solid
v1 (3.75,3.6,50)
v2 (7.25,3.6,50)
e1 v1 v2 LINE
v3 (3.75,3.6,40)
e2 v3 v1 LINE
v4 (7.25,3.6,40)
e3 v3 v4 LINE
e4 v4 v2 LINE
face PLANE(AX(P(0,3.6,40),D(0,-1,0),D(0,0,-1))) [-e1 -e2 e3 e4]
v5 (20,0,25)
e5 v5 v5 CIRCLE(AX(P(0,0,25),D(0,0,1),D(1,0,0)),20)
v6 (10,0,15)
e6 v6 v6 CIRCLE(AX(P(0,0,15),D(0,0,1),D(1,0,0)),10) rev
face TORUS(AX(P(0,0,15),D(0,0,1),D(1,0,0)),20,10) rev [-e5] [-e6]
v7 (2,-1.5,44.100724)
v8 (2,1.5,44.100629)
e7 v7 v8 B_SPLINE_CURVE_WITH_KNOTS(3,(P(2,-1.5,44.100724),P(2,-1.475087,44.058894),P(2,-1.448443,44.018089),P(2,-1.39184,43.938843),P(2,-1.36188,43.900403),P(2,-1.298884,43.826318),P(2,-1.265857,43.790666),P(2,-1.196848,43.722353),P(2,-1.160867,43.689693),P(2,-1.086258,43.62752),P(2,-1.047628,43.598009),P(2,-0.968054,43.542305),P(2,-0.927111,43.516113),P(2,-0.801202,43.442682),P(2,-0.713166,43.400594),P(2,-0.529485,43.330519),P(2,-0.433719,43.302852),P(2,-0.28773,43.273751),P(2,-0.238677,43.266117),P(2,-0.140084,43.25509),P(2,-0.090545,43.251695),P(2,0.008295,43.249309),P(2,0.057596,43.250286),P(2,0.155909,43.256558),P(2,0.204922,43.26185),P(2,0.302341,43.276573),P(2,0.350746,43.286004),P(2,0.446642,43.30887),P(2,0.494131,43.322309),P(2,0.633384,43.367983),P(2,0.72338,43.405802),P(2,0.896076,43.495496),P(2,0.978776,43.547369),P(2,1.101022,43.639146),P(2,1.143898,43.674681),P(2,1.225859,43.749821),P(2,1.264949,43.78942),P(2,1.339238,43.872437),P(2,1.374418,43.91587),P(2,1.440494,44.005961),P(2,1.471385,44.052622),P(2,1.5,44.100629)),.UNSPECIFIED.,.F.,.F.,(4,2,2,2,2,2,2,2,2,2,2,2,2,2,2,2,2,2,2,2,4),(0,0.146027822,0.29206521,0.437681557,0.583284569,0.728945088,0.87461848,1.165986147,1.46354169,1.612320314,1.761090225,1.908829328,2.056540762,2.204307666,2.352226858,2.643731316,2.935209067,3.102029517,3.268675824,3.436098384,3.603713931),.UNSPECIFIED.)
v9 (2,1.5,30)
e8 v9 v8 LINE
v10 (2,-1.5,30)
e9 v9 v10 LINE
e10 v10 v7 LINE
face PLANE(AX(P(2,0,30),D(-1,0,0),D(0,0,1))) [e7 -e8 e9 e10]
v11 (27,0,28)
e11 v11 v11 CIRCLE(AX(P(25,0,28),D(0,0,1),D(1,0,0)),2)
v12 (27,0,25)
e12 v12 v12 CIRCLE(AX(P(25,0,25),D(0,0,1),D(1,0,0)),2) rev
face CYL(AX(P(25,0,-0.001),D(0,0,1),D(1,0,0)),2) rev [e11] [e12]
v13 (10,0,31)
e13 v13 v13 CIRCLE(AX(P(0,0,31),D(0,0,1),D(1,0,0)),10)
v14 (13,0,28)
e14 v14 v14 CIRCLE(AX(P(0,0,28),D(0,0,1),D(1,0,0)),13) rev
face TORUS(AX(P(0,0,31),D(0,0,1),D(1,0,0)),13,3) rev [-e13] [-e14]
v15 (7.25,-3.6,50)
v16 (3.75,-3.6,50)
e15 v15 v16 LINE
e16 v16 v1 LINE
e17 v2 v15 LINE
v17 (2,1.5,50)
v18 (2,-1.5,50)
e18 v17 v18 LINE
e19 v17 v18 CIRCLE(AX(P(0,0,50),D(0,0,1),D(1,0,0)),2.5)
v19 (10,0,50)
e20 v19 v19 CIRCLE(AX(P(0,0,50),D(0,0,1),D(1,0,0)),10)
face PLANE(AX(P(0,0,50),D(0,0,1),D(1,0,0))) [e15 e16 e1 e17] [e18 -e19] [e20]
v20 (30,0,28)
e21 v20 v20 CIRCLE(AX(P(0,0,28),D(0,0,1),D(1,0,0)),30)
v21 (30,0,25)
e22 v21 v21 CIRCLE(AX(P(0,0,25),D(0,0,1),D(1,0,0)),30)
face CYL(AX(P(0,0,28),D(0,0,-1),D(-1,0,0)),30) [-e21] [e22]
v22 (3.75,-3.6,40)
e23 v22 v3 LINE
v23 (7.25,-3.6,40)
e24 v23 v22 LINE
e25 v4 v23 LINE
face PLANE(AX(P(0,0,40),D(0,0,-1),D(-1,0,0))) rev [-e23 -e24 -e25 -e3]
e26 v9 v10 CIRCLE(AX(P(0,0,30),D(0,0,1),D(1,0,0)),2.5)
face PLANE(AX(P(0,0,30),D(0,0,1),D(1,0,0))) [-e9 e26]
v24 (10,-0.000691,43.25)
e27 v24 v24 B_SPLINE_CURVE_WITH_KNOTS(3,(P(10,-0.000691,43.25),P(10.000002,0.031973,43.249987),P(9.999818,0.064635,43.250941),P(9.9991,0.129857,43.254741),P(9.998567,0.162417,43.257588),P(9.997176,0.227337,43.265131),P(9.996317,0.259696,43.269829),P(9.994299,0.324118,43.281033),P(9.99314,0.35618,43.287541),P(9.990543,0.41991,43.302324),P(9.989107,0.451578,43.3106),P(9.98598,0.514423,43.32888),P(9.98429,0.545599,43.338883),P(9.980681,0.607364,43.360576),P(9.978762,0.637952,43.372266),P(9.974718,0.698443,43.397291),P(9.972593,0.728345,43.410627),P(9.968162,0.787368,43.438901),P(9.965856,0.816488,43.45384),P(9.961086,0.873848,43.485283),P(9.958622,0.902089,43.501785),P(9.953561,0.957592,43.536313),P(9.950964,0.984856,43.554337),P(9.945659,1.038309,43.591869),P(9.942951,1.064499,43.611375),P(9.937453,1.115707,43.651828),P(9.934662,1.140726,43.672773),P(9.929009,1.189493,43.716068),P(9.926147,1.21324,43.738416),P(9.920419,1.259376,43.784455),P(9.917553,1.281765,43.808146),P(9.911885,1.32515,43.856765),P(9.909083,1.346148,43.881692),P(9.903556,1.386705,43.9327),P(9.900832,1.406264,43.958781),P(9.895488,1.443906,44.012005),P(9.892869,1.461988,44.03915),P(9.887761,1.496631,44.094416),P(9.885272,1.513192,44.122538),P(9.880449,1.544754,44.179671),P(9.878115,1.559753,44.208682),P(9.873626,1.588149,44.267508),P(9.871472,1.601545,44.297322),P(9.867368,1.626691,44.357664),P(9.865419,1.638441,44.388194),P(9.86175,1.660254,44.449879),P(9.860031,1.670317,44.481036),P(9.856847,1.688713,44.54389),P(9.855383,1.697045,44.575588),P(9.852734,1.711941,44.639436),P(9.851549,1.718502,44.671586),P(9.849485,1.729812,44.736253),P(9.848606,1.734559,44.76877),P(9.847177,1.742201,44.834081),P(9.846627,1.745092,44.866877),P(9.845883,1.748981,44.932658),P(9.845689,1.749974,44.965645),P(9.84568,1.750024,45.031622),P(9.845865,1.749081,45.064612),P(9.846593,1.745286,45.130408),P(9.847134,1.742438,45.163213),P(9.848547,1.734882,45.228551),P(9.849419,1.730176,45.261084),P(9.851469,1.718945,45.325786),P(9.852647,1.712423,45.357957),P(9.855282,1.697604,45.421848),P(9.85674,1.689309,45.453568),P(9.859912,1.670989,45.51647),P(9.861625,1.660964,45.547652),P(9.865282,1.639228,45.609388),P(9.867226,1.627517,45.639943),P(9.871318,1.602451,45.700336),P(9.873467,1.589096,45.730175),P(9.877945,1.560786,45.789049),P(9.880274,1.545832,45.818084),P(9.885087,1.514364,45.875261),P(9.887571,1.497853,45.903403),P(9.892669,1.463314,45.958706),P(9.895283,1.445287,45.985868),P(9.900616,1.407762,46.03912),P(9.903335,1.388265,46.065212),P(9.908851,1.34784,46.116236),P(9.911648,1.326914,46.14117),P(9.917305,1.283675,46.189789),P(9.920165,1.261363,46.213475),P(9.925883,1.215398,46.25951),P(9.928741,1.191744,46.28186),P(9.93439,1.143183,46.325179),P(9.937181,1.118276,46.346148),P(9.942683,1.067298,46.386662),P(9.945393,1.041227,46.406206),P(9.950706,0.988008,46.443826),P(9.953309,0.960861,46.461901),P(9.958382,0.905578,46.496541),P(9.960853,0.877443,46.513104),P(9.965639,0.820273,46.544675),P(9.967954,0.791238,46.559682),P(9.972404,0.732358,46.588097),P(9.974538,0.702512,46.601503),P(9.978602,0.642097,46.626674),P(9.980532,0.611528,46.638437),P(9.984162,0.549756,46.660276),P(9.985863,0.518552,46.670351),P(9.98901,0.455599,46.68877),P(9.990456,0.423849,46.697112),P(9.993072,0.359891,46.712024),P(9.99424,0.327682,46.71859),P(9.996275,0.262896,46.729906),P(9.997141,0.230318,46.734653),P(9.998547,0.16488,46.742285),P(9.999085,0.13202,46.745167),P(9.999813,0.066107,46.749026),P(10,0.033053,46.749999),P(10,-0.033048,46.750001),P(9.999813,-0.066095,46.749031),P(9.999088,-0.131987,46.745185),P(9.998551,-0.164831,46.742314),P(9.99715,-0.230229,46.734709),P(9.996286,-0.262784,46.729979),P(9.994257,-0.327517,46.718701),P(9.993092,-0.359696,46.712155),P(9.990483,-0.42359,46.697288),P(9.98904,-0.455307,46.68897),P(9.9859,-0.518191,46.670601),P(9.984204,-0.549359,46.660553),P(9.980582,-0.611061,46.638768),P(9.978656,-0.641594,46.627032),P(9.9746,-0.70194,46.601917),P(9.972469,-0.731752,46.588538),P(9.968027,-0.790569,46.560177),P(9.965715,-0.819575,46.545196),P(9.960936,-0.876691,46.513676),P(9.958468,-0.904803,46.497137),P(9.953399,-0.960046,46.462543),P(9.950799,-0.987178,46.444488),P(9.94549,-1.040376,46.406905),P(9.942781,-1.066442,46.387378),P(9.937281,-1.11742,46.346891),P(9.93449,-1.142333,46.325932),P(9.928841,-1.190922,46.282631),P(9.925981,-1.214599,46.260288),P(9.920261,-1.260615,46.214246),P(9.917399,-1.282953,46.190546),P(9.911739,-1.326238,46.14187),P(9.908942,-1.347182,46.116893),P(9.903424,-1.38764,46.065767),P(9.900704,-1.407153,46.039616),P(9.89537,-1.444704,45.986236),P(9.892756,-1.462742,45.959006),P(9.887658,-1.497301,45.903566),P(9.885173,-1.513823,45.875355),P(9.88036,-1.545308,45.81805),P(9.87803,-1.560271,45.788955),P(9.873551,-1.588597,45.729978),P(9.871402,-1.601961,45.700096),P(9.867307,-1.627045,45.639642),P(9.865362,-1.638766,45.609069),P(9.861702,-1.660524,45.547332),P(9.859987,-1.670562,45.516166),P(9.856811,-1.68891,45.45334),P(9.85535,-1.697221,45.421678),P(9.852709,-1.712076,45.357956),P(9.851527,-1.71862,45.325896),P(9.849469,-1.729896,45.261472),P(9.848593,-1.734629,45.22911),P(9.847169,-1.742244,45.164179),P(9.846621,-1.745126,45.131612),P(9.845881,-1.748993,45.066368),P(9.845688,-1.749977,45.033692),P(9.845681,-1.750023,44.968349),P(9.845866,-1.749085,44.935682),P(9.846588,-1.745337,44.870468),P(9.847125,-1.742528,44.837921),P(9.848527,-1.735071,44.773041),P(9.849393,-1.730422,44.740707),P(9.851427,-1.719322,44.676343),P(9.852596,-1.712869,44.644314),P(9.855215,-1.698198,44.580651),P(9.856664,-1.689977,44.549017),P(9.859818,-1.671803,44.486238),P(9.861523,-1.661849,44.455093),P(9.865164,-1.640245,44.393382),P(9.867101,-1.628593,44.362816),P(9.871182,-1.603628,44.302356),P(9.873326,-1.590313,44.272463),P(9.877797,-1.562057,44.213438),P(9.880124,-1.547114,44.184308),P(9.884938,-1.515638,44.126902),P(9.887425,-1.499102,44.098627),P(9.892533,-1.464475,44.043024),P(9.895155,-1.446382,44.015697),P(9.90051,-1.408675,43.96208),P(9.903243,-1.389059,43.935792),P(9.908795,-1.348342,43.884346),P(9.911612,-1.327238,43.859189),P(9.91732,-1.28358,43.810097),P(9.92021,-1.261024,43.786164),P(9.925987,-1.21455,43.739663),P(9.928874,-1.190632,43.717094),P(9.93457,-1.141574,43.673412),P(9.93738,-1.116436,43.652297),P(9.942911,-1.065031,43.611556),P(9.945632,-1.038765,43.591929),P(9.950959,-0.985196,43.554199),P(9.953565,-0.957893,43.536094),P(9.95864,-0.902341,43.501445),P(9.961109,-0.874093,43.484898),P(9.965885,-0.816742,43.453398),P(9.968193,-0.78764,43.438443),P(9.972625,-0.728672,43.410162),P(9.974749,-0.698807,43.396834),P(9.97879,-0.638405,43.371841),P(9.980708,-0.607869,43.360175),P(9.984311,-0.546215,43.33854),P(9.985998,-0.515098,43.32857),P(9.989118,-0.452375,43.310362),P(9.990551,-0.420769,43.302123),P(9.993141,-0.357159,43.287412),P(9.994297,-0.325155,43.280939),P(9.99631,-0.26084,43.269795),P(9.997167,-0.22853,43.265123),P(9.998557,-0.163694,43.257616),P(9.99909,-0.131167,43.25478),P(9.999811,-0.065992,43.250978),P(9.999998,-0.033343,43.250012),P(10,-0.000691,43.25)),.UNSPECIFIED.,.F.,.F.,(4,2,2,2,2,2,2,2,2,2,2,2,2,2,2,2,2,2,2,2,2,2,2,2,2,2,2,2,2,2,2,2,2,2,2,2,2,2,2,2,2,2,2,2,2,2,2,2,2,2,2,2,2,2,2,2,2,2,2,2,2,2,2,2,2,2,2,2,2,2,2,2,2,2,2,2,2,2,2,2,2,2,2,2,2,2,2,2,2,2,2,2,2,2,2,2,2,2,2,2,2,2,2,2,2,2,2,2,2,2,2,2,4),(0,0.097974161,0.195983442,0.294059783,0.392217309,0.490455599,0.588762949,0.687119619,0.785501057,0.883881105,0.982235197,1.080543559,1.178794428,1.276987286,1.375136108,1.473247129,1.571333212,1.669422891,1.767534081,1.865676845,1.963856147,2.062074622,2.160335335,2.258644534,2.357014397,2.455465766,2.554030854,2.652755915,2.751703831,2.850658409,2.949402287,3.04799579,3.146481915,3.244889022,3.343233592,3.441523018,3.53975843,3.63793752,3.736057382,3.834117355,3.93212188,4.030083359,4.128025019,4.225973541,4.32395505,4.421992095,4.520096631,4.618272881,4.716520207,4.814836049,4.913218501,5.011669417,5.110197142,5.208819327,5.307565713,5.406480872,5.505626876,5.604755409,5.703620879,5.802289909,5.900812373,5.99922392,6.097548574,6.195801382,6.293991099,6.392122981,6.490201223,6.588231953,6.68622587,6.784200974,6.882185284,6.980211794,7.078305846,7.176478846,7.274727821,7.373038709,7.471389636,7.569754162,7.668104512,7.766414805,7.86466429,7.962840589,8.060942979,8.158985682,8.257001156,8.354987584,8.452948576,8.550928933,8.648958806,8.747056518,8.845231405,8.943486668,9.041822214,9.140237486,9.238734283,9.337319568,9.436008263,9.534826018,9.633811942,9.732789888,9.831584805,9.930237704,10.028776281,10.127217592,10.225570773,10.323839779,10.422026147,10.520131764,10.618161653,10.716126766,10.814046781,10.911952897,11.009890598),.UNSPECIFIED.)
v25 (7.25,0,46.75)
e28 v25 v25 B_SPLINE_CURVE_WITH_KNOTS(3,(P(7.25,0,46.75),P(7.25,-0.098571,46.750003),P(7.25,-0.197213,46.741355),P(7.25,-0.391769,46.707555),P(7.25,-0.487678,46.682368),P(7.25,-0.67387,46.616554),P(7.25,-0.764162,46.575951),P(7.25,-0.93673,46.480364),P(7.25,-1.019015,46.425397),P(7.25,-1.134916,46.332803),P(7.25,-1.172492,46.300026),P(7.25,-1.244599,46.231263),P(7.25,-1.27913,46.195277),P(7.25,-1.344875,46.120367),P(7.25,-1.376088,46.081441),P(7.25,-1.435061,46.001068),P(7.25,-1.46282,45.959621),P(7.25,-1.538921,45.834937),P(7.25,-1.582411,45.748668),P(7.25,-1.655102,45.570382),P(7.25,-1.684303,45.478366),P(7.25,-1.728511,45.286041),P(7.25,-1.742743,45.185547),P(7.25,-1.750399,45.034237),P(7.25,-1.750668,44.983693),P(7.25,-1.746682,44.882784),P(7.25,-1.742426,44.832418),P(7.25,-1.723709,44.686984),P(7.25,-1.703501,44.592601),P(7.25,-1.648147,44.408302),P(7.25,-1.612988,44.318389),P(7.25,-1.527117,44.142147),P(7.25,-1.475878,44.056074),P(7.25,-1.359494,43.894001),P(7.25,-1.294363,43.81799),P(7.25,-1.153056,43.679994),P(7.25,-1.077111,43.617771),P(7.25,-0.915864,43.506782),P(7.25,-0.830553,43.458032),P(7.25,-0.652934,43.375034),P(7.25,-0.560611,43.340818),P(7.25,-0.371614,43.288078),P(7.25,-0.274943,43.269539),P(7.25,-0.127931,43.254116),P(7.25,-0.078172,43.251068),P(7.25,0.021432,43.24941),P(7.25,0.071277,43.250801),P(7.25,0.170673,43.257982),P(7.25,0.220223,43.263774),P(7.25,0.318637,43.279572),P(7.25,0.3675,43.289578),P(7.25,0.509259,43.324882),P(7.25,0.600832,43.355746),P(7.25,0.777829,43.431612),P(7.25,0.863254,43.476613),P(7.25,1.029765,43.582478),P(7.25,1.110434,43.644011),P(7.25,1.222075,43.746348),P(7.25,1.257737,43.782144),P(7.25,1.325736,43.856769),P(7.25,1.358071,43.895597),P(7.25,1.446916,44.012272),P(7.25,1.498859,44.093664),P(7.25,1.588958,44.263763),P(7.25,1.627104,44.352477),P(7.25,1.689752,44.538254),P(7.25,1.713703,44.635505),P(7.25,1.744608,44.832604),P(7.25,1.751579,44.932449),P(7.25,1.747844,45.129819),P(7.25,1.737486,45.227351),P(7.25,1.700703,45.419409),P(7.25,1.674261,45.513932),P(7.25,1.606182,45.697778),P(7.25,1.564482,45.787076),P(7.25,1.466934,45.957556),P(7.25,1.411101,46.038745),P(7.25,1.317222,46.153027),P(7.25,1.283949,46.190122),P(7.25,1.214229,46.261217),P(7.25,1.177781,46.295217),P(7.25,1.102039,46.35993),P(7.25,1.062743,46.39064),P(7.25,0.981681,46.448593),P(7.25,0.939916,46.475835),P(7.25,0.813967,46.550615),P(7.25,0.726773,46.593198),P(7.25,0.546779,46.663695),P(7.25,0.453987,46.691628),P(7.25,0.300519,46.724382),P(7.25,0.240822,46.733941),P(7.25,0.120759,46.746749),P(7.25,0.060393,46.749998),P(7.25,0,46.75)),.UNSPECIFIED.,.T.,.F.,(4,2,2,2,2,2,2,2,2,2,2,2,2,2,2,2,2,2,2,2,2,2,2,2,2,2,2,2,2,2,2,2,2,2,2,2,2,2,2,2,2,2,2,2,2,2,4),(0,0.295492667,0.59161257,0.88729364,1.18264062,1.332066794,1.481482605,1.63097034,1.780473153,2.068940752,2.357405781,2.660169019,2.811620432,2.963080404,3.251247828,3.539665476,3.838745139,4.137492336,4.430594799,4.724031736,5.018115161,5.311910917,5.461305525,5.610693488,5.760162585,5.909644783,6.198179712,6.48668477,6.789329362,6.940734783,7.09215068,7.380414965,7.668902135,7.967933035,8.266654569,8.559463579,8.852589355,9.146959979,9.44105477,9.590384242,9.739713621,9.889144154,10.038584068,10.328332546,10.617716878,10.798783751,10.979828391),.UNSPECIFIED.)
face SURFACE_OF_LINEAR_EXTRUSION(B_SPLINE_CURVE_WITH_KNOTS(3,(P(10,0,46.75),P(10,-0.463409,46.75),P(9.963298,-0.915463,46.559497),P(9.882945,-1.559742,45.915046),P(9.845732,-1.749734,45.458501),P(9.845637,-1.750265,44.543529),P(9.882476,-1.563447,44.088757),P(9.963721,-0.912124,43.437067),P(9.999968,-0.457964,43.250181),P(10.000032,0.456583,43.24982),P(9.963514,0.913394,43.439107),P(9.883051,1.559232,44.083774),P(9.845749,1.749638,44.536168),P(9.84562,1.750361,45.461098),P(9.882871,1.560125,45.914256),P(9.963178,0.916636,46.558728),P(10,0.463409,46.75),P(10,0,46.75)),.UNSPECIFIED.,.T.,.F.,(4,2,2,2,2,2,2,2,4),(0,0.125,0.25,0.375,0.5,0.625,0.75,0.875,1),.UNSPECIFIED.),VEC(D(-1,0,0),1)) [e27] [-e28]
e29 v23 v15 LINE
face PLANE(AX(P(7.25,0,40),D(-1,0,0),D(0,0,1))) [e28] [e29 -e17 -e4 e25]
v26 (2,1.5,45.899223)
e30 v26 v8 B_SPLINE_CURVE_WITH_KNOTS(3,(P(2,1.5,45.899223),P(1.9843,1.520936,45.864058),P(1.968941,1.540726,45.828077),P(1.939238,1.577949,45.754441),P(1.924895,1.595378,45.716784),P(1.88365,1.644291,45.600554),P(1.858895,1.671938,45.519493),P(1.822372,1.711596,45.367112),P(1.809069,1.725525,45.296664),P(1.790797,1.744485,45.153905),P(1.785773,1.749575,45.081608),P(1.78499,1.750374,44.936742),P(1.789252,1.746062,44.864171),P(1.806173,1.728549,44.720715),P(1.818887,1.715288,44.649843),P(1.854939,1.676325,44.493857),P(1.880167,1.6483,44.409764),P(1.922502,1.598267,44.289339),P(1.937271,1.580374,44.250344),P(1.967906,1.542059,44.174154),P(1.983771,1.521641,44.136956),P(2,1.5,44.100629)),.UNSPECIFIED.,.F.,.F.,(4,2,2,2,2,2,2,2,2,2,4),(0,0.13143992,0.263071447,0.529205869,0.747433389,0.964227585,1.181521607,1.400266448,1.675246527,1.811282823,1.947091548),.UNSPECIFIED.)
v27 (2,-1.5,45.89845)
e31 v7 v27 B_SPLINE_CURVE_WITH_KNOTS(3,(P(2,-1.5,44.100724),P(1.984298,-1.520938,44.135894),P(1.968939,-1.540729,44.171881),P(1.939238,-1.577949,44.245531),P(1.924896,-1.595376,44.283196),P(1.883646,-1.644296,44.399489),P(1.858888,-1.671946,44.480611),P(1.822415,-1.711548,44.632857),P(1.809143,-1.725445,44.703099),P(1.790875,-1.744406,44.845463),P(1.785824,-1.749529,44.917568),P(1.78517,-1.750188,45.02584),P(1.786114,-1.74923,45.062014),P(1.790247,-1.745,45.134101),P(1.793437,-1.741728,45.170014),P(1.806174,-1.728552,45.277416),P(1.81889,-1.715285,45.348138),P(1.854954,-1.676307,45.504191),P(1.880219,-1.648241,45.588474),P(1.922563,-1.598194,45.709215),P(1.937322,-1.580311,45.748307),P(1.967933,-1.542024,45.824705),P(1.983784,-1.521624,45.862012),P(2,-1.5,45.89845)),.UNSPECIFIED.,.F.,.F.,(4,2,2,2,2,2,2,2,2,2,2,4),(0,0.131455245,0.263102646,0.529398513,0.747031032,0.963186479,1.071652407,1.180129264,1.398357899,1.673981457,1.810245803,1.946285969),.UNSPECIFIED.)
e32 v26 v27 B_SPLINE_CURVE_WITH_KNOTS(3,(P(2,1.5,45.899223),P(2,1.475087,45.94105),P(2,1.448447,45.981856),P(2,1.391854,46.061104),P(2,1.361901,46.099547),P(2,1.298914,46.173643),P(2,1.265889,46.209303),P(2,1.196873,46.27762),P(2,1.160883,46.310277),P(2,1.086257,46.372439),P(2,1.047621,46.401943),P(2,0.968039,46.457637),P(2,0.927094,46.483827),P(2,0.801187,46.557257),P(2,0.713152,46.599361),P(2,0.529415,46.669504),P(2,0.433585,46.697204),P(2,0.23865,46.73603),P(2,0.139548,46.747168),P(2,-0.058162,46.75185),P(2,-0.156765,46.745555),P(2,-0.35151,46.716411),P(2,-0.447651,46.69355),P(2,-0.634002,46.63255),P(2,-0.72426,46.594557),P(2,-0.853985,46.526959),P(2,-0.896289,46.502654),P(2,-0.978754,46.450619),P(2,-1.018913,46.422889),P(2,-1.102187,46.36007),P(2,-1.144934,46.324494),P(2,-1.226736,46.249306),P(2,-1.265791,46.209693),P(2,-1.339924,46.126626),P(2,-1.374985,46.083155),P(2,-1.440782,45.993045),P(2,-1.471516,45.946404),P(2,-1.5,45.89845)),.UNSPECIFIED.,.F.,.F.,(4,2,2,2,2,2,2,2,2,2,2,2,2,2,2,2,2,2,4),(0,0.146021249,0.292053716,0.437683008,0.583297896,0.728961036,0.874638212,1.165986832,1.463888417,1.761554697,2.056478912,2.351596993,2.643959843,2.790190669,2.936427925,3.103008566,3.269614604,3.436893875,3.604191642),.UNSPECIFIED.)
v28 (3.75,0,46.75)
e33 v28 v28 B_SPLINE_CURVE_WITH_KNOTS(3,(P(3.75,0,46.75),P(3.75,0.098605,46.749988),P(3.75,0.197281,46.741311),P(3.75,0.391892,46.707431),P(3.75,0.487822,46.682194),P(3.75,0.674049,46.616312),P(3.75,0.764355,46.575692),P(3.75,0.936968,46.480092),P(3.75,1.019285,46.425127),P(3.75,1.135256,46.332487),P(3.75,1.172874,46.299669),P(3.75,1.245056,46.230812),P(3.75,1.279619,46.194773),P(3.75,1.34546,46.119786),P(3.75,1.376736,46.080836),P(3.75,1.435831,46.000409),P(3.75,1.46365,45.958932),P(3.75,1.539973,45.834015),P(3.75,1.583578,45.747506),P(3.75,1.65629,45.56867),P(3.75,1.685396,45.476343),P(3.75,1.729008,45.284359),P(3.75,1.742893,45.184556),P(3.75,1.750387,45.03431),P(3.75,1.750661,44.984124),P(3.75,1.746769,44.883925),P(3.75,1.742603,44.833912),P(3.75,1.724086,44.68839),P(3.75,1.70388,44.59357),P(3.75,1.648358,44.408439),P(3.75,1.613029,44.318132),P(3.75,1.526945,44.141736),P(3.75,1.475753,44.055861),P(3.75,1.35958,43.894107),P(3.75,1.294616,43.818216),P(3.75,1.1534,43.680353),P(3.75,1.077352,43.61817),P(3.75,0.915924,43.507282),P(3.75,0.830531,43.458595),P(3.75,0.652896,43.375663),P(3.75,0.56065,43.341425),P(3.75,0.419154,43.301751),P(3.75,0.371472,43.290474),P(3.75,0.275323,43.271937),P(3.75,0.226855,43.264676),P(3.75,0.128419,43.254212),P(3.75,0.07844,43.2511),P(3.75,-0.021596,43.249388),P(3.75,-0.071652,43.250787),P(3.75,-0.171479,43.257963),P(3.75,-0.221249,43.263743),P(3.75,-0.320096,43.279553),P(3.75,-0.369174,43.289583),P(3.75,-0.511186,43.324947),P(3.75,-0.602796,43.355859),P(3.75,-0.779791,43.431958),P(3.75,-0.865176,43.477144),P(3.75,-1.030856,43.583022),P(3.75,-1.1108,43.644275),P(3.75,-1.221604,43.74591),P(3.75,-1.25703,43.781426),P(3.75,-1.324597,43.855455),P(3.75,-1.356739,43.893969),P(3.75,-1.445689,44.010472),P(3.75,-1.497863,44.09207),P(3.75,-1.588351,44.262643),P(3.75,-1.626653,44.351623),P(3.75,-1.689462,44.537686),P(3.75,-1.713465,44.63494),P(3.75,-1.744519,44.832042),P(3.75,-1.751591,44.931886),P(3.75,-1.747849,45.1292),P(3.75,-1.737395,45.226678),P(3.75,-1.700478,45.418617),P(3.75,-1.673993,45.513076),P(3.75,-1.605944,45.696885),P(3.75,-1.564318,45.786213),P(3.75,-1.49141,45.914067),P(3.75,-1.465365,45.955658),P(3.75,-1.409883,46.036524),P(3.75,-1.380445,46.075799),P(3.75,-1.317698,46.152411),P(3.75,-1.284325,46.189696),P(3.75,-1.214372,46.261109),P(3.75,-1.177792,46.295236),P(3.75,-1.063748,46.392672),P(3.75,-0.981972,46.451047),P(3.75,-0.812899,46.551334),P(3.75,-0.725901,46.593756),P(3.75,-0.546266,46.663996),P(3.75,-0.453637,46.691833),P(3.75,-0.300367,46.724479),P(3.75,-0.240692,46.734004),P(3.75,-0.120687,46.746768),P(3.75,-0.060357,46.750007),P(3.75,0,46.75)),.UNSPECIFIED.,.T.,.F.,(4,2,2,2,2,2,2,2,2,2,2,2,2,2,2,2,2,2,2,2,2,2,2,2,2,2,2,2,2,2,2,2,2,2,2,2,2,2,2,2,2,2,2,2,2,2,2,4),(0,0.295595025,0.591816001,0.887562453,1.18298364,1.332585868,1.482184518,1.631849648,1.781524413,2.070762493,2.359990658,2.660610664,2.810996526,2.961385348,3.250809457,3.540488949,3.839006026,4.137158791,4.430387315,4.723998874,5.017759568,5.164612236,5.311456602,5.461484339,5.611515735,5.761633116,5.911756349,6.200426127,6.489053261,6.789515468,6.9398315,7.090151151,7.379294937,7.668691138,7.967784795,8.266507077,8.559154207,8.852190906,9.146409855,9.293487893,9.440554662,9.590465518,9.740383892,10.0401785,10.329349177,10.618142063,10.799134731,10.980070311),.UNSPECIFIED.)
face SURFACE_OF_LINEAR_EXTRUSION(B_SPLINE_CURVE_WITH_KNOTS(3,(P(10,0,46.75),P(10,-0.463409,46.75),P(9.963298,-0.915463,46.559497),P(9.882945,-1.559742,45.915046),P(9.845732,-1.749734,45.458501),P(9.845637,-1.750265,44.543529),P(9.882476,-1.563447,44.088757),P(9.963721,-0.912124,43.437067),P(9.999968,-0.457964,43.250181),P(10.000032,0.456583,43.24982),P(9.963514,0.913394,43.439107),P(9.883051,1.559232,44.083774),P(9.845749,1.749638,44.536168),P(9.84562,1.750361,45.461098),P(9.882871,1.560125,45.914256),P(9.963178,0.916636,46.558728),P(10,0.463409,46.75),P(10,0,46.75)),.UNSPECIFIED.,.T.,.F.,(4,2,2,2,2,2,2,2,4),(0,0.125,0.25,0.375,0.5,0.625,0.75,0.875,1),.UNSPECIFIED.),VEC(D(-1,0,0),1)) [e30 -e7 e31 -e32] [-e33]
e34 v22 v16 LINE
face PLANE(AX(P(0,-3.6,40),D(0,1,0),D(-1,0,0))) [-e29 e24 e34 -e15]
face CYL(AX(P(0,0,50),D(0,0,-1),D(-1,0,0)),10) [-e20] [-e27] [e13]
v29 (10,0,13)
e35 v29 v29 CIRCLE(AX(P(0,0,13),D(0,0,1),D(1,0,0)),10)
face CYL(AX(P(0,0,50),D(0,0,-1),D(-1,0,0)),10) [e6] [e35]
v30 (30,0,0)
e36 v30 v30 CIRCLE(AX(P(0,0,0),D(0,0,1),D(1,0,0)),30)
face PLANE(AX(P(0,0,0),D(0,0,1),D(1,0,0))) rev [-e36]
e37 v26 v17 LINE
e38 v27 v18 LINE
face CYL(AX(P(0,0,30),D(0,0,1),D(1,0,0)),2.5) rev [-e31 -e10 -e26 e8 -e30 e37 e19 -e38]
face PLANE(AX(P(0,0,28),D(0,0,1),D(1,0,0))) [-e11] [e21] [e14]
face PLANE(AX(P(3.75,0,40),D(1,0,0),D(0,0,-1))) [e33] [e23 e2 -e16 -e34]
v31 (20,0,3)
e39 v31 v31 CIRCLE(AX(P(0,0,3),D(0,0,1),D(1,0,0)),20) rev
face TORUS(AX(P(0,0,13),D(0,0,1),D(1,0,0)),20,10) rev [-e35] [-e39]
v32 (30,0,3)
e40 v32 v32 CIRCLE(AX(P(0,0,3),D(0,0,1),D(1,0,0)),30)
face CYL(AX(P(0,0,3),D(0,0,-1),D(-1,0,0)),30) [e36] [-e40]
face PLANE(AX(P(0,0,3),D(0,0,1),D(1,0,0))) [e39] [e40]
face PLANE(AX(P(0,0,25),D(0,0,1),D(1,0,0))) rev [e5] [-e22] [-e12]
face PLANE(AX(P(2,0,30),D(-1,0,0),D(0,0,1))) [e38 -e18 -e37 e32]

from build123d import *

# Parameters (mm, degrees)
CROQUIS1_R              = 10
SALIENTE_EXTRUIR2_DEPTH = 50
CROQUIS4_R              = 30
SALIENTE_EXTRUIR3_DEPTH = 3
SALIENTE_EXTRUIR4_START = 25
CROQUIS5_R              = 30
SALIENTE_EXTRUIR4_DEPTH = 3
REDONDEO2_R             = 10
CORTAR_EXTRUIR1_START   = 50
CORTAR_EXTRUIR1_DEPTH   = 20
CORTAR_EXTRUIR2_START   = 50
CROQUIS7_W              = 3.5
CROQUIS7_H              = 7.2
CORTAR_EXTRUIR2_DEPTH   = 10
CORTAR_EXTRUIR3_START   = 1.785357468
CORTAR_EXTRUIR3_DEPTH   = 8.214642632
CORTAR_EXTRUIR4_START   = 25
CROQUIS9_R              = 2
CORTAR_EXTRUIR4_DEPTH   = 3
REDONDEO3_R             = 3


# Read off the part's stored shape, not the designer's step: Cortar-Extruir3
with BuildPart() as part:
    # Croquis1 → Saliente-Extruir2 (new body)
    with BuildSketch(Plane.XY):
        Circle(CROQUIS1_R)
    extrude(amount=SALIENTE_EXTRUIR2_DEPTH)

    # Croquis4 → Saliente-Extruir3 (add)
    with BuildSketch(Plane.XY):
        Circle(CROQUIS4_R)
    extrude(amount=SALIENTE_EXTRUIR3_DEPTH)

    # Croquis5 → Saliente-Extruir4 (add)
    with BuildSketch(Plane.XY.offset(SALIENTE_EXTRUIR4_START)):
        Circle(CROQUIS5_R)
    extrude(amount=SALIENTE_EXTRUIR4_DEPTH)

    # Redondeo2
    redondeo2_edges = [part.edges().sort_by_distance(p)[0] for p in [
        (-10, 0, 25),
        (-10, 0, 3),
    ]]
    fillet(redondeo2_edges, radius=REDONDEO2_R)

    # Croquis6 → Cortar-Extruir1 (cut)
    with BuildSketch(Plane.XY.offset(CORTAR_EXTRUIR1_START)):
        with BuildLine():
            Line((2, 1.5), (2, -1.5))
            ThreePointArc((2, -1.5), (-2.5, 0), (2, 1.5))
        make_face()
    extrude(amount=-CORTAR_EXTRUIR1_DEPTH, mode=Mode.SUBTRACT)

    # Croquis7 → Cortar-Extruir2 (cut)
    with BuildSketch(Plane.XY.offset(CORTAR_EXTRUIR2_START)):
        with Locations((5.5, 0)):
            Rectangle(CROQUIS7_W, CROQUIS7_H)
    extrude(amount=-CORTAR_EXTRUIR2_DEPTH, mode=Mode.SUBTRACT)

    # Cortar-Extruir3 outline → Cortar-Extruir3 (cut)
    with BuildSketch(Plane(origin=(0, 0, 0), x_dir=(0, 0, -1), z_dir=(1, 0, 0)).offset(CORTAR_EXTRUIR3_START)):
        with BuildLine():
            add(Edge.make_bspline(
                [(-43.250000008, 0), (-43.250010298, 0.457042806), (-43.439269311, 0.91355666), (-44.08377392, 1.559232298), (-44.536167579, 1.749638189), (-45.461098225, 1.750360744), (-45.914256169, 1.560125471), (-46.558728463, 0.916635921), (-46.75, 0.463408547), (-46.75, -0.463408547), (-46.559497121, -0.915462774), (-45.915045576, -1.559741953), (-45.458501244, -1.749734355), (-44.543528816, -1.750265056), (-44.088756623, -1.563446648), (-43.437067231, -0.912124478), (-43.250180582, -0.457964068), (-43.250000045, -0.000460382), (-43.250000003, -0.000230191), (-43.250000008, 0)],
                knots=[0.500062925, 0.500062925, 0.500062925, 0.500062925, 0.625, 0.625, 0.750000001, 0.750000001, 0.875000002, 0.875000002, 1.000000004, 1.000000004, 1.125000006, 1.125000006, 1.250000009, 1.250000009, 1.375000013, 1.375000013, 1.500000015, 1.500000015, 1.50006294, 1.50006294, 1.50006294, 1.50006294], degree=3))
        make_face()
    extrude(amount=CORTAR_EXTRUIR3_DEPTH, mode=Mode.SUBTRACT)

    # Croquis9 → Cortar-Extruir4 (cut)
    with BuildSketch(Plane.XY.offset(CORTAR_EXTRUIR4_START)):
        with Locations((25, 0)):
            Circle(CROQUIS9_R)
    extrude(amount=CORTAR_EXTRUIR4_DEPTH, mode=Mode.SUBTRACT)

    # Redondeo3
    redondeo3_edges = [part.edges().sort_by_distance(p)[0] for p in [
        (-10, 0, 28),
    ]]
    fillet(redondeo3_edges, radius=REDONDEO3_R)


solid = part.part
